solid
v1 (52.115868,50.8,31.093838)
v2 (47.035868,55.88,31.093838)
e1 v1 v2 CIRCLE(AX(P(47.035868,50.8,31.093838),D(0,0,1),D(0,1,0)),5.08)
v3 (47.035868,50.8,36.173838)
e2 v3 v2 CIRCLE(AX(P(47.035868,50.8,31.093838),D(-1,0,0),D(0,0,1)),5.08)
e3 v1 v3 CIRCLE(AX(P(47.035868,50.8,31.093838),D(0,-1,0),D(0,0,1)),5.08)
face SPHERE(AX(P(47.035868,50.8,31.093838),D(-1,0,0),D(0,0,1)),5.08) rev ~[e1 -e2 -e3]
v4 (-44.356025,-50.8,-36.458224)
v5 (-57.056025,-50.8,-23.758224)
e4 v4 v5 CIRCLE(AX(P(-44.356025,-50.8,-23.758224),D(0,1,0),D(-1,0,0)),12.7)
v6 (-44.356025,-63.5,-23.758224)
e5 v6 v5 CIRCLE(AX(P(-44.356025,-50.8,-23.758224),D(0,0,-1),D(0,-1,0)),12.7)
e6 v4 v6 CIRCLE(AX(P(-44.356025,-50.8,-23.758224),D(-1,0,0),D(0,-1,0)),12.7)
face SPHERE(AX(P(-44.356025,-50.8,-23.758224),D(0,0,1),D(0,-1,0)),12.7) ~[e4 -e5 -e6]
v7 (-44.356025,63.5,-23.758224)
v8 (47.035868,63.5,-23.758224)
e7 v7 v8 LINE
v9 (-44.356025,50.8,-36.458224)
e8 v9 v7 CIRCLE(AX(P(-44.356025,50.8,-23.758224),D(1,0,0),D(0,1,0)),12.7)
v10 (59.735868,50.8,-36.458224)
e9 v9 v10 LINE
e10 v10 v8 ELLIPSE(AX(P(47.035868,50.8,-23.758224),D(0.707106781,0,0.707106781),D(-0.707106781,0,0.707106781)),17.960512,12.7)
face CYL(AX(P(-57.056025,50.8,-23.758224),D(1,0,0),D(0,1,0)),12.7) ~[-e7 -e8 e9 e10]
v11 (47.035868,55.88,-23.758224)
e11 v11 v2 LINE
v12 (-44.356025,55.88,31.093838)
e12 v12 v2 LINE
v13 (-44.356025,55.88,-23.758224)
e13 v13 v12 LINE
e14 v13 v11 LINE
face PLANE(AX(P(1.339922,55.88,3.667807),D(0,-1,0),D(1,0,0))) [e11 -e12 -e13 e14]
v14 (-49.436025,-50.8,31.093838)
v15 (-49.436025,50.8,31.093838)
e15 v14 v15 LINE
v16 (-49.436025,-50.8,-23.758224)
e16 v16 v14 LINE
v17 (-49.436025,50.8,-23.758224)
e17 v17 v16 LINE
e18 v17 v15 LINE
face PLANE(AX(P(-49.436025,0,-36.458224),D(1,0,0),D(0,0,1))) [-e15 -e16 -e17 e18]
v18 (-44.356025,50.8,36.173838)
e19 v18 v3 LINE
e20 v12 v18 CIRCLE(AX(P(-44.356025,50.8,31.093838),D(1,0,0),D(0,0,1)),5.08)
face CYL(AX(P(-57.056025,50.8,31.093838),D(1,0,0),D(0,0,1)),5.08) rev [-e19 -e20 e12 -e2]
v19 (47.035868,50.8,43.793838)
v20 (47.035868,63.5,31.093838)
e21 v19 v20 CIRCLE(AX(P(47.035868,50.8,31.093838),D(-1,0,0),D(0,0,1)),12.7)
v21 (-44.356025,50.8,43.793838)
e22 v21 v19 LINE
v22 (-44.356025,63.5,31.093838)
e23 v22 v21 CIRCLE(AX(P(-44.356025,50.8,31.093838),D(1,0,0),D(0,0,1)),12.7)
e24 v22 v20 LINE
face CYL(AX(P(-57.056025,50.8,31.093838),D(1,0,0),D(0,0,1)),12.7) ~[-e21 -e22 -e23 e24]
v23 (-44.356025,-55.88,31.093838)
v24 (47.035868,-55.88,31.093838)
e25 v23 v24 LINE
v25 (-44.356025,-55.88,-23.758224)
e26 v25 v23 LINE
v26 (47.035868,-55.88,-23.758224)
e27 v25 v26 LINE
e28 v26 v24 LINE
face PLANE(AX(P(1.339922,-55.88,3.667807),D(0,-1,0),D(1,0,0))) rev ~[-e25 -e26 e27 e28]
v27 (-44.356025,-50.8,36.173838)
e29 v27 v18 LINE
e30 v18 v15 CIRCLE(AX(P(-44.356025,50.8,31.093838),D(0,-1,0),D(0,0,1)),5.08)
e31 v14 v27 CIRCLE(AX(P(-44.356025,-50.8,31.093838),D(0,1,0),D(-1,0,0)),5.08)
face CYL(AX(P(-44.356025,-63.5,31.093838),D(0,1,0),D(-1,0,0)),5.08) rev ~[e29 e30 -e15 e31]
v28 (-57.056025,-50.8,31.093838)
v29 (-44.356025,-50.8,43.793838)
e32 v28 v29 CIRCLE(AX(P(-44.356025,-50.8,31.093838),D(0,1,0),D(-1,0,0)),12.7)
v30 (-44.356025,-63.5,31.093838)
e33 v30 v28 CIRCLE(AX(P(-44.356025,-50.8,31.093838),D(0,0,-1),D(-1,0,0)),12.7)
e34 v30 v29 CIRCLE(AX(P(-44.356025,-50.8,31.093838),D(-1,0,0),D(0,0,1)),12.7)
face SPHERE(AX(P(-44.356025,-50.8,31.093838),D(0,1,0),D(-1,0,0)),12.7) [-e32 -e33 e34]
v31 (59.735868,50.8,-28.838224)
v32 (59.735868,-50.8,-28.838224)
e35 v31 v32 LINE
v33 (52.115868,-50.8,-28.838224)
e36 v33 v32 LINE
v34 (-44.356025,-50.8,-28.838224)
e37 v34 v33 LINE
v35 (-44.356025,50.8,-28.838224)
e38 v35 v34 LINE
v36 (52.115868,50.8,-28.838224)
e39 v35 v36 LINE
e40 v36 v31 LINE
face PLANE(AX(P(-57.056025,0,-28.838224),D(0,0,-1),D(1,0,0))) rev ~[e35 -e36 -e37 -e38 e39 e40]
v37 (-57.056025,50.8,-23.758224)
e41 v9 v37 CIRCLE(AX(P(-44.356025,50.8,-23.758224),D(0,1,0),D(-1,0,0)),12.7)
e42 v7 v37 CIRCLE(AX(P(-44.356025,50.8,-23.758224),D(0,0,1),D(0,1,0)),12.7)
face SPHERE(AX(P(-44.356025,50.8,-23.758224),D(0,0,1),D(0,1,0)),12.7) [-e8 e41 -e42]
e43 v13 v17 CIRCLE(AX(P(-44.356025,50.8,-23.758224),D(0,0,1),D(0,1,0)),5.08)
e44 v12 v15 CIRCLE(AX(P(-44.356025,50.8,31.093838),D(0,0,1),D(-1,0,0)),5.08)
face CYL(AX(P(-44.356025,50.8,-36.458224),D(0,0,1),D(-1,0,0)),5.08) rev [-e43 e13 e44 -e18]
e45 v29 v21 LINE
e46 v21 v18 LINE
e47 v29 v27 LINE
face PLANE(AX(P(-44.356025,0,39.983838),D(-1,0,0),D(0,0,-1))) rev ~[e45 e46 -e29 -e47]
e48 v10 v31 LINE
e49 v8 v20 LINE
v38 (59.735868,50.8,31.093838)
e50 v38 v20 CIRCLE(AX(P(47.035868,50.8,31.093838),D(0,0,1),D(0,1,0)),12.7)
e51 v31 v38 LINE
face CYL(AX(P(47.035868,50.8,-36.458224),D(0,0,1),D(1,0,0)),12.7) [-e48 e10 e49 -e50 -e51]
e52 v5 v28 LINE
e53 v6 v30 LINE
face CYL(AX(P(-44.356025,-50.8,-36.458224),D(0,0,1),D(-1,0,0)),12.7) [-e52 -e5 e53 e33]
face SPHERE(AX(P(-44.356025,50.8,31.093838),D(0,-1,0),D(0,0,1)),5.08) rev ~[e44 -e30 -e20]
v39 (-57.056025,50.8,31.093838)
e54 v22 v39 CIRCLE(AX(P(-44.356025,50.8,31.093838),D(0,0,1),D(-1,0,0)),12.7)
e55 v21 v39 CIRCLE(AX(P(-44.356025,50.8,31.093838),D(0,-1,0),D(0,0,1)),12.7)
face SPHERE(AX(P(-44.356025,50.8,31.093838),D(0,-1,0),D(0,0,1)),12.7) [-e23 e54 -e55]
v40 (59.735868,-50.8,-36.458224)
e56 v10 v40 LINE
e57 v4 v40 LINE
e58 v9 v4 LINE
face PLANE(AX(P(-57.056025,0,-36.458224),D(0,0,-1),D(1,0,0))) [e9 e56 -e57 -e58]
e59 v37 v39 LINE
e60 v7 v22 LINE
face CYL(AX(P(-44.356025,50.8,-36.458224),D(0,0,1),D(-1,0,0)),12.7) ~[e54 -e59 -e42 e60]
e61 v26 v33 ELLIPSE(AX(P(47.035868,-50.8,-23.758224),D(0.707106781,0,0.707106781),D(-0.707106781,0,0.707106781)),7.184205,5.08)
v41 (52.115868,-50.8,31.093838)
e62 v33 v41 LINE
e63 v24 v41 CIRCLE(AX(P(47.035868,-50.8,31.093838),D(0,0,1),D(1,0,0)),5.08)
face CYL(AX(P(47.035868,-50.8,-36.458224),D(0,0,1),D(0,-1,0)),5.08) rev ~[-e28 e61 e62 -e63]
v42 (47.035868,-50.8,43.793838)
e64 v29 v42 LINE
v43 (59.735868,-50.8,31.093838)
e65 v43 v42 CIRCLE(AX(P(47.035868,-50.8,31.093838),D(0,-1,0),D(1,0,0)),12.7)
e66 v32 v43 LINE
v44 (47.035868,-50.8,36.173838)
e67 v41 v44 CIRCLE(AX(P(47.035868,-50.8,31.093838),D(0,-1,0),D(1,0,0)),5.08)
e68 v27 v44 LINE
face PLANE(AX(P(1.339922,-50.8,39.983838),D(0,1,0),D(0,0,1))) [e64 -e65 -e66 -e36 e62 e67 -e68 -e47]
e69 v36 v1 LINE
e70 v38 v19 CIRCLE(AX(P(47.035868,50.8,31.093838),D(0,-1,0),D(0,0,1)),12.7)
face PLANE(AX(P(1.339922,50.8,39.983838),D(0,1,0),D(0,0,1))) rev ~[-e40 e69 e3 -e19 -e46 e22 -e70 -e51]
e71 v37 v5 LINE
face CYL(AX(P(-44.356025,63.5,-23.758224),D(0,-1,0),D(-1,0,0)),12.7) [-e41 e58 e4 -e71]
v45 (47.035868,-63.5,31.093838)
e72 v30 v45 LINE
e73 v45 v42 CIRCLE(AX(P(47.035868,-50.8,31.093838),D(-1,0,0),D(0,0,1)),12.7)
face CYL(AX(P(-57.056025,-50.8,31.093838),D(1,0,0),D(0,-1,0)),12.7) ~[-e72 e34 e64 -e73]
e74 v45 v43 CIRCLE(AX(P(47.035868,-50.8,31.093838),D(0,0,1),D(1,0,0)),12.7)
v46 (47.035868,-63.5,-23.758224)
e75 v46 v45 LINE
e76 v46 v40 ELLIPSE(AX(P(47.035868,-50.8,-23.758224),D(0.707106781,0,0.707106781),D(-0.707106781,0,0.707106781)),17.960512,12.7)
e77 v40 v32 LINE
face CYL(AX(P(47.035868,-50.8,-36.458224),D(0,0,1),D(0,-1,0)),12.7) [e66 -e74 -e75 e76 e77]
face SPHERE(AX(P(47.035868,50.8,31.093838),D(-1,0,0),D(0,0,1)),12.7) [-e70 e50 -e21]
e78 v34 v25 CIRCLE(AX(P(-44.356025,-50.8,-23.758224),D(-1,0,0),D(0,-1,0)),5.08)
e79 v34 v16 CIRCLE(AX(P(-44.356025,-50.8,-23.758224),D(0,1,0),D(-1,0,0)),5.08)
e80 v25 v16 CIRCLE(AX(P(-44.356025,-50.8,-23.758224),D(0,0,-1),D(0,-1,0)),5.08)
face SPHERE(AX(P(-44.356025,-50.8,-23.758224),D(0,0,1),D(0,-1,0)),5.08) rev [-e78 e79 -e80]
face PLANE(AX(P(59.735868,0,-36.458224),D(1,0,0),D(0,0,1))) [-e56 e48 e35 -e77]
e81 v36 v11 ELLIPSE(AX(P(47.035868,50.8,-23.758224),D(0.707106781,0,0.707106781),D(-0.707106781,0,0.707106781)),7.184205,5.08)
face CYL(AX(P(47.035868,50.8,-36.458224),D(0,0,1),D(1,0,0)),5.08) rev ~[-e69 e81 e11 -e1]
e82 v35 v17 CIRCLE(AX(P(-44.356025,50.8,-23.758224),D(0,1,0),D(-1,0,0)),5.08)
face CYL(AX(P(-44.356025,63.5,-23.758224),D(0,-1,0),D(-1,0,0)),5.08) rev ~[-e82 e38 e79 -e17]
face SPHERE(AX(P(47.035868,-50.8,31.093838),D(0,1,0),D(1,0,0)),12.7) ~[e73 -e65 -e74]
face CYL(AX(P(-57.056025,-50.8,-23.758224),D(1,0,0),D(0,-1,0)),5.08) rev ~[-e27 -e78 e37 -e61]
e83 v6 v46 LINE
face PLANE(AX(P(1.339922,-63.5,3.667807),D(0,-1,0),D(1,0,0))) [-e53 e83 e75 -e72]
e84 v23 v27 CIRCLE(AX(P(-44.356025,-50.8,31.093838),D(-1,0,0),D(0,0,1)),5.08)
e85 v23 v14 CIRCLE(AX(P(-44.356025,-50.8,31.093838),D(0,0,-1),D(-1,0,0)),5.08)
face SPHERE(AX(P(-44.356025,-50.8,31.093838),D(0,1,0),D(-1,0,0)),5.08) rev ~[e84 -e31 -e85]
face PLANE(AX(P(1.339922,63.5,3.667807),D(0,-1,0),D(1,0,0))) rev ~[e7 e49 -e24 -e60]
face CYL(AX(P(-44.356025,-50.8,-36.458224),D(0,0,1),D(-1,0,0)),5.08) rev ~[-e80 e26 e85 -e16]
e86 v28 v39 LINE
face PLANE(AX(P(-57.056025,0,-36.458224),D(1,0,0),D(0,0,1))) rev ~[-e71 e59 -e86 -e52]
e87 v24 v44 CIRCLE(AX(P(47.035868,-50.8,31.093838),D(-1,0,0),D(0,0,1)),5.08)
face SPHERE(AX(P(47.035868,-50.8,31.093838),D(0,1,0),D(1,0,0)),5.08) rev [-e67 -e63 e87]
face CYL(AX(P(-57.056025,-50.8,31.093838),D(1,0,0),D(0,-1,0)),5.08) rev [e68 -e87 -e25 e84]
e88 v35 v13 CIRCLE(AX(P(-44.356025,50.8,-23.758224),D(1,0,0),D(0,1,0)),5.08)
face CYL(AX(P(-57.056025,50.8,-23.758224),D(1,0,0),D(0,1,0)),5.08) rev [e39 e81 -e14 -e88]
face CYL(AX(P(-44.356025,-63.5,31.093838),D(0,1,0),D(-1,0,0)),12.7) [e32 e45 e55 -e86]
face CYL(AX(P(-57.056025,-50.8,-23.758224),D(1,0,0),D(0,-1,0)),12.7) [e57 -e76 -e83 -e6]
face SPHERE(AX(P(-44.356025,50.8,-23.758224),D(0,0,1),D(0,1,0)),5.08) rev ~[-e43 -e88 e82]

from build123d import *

# Parameters (mm, degrees)
F0_W     = 116.7918927968
F0_H     = 80.2520625293
F1_DEPTH = 63.5
F2_R     = 12.7
F3_T     = 7.62


# Not quite as in the source:
# - a shell that OpenCascade refuses in one call is made with other operations: the cavity is built on its own and cut out


with BuildPart() as f1:
    # F0 (on Front) → F1 (new body, symmetric)
    with BuildSketch(Plane.XZ):
        with Locations((1.3399217278, 3.6678072065)):
            Rectangle(F0_W, F0_H)
    extrude(amount=F1_DEPTH, both=True)

    # F2
    f2_edges = [f1.edges().sort_by_distance(p)[0] for p in [
        (-57.056025, 0, 43.793838),
        (1.339922, 63.5, 43.793838),
        (59.735868, 0, 43.793838),
        (-57.056025, -63.5, 3.667807),
        (-57.056025, 63.5, 3.667807),
        (59.735868, -63.5, 3.667807),
        (59.735868, 63.5, 3.667807),
        (1.339922, 63.5, -36.458224),
        (1.339922, -63.5, -36.458224),
        (-57.056025, 0, -36.458224),
        (1.339922, -63.5, 43.793838),
    ]]
    fillet(f2_edges, radius=F2_R)

    # F3: shell of thickness 7.62, made by hand


with BuildPart() as f3_core1:
    # F3_t2: copy of F1
    add(f1.part)

    # the walls: a layer under each face that stays
    f3_faces = [f3_core1.faces().sort_by_distance(p)[0] for p in [
        (-53.3362807917, 0, 40.0740945922),
        (1.3399217278, 59.7802561211, 40.0740945922),
        (1.3399217278, -59.7802561211, 40.0740945922),
        (-50.7060246706, 59.7802561211, 37.4438384712),
        (-50.7060246706, -59.7802561211, 37.4438384712),
        (-57.0560246706, 0, 3.6678072065),
        (56.0161242472, 57.15, 37.4438384712),
        (1.3399217278, 63.5, 3.6678072065),
        (53.3858681262, -59.7802561211, 37.4438384712),
        (1.3399217278, -63.5, 3.6678072065),
        (-53.3362807917, 59.7802561211, 3.6678072065),
        (-53.3362807917, -59.7802561211, 3.6678072065),
        (-53.3362807917, 0, -32.7384801792),
        (56.0161242472, 59.7802561211, -2.6821927935),
        (7.6899217278, 59.7802561211, -32.7384801792),
        (56.0161240867, -59.7802562816, -2.6821927935),
        (7.6899217278, -59.7802562816, -32.7384800187),
        (7.6899217278, 0, -36.4582240582),
        (-50.7060246706, 57.15, -32.7384801792),
        (-50.7060246706, -57.15, -32.7384801792),
    ]]
    thicken(f3_faces, amount=-F3_T, mode=Mode.SUBTRACT)


with BuildPart() as f1_1:
    add(f1.part)

    # what is left inside the walls is the cavity
    f3_cavity = [f3_core1.part.solids().sort_by_distance(p)[0] for p in [
        (7.689922, 16.933333, -28.762024),
    ]]
    add(f3_cavity, mode=Mode.SUBTRACT)


solid = f1_1.part
